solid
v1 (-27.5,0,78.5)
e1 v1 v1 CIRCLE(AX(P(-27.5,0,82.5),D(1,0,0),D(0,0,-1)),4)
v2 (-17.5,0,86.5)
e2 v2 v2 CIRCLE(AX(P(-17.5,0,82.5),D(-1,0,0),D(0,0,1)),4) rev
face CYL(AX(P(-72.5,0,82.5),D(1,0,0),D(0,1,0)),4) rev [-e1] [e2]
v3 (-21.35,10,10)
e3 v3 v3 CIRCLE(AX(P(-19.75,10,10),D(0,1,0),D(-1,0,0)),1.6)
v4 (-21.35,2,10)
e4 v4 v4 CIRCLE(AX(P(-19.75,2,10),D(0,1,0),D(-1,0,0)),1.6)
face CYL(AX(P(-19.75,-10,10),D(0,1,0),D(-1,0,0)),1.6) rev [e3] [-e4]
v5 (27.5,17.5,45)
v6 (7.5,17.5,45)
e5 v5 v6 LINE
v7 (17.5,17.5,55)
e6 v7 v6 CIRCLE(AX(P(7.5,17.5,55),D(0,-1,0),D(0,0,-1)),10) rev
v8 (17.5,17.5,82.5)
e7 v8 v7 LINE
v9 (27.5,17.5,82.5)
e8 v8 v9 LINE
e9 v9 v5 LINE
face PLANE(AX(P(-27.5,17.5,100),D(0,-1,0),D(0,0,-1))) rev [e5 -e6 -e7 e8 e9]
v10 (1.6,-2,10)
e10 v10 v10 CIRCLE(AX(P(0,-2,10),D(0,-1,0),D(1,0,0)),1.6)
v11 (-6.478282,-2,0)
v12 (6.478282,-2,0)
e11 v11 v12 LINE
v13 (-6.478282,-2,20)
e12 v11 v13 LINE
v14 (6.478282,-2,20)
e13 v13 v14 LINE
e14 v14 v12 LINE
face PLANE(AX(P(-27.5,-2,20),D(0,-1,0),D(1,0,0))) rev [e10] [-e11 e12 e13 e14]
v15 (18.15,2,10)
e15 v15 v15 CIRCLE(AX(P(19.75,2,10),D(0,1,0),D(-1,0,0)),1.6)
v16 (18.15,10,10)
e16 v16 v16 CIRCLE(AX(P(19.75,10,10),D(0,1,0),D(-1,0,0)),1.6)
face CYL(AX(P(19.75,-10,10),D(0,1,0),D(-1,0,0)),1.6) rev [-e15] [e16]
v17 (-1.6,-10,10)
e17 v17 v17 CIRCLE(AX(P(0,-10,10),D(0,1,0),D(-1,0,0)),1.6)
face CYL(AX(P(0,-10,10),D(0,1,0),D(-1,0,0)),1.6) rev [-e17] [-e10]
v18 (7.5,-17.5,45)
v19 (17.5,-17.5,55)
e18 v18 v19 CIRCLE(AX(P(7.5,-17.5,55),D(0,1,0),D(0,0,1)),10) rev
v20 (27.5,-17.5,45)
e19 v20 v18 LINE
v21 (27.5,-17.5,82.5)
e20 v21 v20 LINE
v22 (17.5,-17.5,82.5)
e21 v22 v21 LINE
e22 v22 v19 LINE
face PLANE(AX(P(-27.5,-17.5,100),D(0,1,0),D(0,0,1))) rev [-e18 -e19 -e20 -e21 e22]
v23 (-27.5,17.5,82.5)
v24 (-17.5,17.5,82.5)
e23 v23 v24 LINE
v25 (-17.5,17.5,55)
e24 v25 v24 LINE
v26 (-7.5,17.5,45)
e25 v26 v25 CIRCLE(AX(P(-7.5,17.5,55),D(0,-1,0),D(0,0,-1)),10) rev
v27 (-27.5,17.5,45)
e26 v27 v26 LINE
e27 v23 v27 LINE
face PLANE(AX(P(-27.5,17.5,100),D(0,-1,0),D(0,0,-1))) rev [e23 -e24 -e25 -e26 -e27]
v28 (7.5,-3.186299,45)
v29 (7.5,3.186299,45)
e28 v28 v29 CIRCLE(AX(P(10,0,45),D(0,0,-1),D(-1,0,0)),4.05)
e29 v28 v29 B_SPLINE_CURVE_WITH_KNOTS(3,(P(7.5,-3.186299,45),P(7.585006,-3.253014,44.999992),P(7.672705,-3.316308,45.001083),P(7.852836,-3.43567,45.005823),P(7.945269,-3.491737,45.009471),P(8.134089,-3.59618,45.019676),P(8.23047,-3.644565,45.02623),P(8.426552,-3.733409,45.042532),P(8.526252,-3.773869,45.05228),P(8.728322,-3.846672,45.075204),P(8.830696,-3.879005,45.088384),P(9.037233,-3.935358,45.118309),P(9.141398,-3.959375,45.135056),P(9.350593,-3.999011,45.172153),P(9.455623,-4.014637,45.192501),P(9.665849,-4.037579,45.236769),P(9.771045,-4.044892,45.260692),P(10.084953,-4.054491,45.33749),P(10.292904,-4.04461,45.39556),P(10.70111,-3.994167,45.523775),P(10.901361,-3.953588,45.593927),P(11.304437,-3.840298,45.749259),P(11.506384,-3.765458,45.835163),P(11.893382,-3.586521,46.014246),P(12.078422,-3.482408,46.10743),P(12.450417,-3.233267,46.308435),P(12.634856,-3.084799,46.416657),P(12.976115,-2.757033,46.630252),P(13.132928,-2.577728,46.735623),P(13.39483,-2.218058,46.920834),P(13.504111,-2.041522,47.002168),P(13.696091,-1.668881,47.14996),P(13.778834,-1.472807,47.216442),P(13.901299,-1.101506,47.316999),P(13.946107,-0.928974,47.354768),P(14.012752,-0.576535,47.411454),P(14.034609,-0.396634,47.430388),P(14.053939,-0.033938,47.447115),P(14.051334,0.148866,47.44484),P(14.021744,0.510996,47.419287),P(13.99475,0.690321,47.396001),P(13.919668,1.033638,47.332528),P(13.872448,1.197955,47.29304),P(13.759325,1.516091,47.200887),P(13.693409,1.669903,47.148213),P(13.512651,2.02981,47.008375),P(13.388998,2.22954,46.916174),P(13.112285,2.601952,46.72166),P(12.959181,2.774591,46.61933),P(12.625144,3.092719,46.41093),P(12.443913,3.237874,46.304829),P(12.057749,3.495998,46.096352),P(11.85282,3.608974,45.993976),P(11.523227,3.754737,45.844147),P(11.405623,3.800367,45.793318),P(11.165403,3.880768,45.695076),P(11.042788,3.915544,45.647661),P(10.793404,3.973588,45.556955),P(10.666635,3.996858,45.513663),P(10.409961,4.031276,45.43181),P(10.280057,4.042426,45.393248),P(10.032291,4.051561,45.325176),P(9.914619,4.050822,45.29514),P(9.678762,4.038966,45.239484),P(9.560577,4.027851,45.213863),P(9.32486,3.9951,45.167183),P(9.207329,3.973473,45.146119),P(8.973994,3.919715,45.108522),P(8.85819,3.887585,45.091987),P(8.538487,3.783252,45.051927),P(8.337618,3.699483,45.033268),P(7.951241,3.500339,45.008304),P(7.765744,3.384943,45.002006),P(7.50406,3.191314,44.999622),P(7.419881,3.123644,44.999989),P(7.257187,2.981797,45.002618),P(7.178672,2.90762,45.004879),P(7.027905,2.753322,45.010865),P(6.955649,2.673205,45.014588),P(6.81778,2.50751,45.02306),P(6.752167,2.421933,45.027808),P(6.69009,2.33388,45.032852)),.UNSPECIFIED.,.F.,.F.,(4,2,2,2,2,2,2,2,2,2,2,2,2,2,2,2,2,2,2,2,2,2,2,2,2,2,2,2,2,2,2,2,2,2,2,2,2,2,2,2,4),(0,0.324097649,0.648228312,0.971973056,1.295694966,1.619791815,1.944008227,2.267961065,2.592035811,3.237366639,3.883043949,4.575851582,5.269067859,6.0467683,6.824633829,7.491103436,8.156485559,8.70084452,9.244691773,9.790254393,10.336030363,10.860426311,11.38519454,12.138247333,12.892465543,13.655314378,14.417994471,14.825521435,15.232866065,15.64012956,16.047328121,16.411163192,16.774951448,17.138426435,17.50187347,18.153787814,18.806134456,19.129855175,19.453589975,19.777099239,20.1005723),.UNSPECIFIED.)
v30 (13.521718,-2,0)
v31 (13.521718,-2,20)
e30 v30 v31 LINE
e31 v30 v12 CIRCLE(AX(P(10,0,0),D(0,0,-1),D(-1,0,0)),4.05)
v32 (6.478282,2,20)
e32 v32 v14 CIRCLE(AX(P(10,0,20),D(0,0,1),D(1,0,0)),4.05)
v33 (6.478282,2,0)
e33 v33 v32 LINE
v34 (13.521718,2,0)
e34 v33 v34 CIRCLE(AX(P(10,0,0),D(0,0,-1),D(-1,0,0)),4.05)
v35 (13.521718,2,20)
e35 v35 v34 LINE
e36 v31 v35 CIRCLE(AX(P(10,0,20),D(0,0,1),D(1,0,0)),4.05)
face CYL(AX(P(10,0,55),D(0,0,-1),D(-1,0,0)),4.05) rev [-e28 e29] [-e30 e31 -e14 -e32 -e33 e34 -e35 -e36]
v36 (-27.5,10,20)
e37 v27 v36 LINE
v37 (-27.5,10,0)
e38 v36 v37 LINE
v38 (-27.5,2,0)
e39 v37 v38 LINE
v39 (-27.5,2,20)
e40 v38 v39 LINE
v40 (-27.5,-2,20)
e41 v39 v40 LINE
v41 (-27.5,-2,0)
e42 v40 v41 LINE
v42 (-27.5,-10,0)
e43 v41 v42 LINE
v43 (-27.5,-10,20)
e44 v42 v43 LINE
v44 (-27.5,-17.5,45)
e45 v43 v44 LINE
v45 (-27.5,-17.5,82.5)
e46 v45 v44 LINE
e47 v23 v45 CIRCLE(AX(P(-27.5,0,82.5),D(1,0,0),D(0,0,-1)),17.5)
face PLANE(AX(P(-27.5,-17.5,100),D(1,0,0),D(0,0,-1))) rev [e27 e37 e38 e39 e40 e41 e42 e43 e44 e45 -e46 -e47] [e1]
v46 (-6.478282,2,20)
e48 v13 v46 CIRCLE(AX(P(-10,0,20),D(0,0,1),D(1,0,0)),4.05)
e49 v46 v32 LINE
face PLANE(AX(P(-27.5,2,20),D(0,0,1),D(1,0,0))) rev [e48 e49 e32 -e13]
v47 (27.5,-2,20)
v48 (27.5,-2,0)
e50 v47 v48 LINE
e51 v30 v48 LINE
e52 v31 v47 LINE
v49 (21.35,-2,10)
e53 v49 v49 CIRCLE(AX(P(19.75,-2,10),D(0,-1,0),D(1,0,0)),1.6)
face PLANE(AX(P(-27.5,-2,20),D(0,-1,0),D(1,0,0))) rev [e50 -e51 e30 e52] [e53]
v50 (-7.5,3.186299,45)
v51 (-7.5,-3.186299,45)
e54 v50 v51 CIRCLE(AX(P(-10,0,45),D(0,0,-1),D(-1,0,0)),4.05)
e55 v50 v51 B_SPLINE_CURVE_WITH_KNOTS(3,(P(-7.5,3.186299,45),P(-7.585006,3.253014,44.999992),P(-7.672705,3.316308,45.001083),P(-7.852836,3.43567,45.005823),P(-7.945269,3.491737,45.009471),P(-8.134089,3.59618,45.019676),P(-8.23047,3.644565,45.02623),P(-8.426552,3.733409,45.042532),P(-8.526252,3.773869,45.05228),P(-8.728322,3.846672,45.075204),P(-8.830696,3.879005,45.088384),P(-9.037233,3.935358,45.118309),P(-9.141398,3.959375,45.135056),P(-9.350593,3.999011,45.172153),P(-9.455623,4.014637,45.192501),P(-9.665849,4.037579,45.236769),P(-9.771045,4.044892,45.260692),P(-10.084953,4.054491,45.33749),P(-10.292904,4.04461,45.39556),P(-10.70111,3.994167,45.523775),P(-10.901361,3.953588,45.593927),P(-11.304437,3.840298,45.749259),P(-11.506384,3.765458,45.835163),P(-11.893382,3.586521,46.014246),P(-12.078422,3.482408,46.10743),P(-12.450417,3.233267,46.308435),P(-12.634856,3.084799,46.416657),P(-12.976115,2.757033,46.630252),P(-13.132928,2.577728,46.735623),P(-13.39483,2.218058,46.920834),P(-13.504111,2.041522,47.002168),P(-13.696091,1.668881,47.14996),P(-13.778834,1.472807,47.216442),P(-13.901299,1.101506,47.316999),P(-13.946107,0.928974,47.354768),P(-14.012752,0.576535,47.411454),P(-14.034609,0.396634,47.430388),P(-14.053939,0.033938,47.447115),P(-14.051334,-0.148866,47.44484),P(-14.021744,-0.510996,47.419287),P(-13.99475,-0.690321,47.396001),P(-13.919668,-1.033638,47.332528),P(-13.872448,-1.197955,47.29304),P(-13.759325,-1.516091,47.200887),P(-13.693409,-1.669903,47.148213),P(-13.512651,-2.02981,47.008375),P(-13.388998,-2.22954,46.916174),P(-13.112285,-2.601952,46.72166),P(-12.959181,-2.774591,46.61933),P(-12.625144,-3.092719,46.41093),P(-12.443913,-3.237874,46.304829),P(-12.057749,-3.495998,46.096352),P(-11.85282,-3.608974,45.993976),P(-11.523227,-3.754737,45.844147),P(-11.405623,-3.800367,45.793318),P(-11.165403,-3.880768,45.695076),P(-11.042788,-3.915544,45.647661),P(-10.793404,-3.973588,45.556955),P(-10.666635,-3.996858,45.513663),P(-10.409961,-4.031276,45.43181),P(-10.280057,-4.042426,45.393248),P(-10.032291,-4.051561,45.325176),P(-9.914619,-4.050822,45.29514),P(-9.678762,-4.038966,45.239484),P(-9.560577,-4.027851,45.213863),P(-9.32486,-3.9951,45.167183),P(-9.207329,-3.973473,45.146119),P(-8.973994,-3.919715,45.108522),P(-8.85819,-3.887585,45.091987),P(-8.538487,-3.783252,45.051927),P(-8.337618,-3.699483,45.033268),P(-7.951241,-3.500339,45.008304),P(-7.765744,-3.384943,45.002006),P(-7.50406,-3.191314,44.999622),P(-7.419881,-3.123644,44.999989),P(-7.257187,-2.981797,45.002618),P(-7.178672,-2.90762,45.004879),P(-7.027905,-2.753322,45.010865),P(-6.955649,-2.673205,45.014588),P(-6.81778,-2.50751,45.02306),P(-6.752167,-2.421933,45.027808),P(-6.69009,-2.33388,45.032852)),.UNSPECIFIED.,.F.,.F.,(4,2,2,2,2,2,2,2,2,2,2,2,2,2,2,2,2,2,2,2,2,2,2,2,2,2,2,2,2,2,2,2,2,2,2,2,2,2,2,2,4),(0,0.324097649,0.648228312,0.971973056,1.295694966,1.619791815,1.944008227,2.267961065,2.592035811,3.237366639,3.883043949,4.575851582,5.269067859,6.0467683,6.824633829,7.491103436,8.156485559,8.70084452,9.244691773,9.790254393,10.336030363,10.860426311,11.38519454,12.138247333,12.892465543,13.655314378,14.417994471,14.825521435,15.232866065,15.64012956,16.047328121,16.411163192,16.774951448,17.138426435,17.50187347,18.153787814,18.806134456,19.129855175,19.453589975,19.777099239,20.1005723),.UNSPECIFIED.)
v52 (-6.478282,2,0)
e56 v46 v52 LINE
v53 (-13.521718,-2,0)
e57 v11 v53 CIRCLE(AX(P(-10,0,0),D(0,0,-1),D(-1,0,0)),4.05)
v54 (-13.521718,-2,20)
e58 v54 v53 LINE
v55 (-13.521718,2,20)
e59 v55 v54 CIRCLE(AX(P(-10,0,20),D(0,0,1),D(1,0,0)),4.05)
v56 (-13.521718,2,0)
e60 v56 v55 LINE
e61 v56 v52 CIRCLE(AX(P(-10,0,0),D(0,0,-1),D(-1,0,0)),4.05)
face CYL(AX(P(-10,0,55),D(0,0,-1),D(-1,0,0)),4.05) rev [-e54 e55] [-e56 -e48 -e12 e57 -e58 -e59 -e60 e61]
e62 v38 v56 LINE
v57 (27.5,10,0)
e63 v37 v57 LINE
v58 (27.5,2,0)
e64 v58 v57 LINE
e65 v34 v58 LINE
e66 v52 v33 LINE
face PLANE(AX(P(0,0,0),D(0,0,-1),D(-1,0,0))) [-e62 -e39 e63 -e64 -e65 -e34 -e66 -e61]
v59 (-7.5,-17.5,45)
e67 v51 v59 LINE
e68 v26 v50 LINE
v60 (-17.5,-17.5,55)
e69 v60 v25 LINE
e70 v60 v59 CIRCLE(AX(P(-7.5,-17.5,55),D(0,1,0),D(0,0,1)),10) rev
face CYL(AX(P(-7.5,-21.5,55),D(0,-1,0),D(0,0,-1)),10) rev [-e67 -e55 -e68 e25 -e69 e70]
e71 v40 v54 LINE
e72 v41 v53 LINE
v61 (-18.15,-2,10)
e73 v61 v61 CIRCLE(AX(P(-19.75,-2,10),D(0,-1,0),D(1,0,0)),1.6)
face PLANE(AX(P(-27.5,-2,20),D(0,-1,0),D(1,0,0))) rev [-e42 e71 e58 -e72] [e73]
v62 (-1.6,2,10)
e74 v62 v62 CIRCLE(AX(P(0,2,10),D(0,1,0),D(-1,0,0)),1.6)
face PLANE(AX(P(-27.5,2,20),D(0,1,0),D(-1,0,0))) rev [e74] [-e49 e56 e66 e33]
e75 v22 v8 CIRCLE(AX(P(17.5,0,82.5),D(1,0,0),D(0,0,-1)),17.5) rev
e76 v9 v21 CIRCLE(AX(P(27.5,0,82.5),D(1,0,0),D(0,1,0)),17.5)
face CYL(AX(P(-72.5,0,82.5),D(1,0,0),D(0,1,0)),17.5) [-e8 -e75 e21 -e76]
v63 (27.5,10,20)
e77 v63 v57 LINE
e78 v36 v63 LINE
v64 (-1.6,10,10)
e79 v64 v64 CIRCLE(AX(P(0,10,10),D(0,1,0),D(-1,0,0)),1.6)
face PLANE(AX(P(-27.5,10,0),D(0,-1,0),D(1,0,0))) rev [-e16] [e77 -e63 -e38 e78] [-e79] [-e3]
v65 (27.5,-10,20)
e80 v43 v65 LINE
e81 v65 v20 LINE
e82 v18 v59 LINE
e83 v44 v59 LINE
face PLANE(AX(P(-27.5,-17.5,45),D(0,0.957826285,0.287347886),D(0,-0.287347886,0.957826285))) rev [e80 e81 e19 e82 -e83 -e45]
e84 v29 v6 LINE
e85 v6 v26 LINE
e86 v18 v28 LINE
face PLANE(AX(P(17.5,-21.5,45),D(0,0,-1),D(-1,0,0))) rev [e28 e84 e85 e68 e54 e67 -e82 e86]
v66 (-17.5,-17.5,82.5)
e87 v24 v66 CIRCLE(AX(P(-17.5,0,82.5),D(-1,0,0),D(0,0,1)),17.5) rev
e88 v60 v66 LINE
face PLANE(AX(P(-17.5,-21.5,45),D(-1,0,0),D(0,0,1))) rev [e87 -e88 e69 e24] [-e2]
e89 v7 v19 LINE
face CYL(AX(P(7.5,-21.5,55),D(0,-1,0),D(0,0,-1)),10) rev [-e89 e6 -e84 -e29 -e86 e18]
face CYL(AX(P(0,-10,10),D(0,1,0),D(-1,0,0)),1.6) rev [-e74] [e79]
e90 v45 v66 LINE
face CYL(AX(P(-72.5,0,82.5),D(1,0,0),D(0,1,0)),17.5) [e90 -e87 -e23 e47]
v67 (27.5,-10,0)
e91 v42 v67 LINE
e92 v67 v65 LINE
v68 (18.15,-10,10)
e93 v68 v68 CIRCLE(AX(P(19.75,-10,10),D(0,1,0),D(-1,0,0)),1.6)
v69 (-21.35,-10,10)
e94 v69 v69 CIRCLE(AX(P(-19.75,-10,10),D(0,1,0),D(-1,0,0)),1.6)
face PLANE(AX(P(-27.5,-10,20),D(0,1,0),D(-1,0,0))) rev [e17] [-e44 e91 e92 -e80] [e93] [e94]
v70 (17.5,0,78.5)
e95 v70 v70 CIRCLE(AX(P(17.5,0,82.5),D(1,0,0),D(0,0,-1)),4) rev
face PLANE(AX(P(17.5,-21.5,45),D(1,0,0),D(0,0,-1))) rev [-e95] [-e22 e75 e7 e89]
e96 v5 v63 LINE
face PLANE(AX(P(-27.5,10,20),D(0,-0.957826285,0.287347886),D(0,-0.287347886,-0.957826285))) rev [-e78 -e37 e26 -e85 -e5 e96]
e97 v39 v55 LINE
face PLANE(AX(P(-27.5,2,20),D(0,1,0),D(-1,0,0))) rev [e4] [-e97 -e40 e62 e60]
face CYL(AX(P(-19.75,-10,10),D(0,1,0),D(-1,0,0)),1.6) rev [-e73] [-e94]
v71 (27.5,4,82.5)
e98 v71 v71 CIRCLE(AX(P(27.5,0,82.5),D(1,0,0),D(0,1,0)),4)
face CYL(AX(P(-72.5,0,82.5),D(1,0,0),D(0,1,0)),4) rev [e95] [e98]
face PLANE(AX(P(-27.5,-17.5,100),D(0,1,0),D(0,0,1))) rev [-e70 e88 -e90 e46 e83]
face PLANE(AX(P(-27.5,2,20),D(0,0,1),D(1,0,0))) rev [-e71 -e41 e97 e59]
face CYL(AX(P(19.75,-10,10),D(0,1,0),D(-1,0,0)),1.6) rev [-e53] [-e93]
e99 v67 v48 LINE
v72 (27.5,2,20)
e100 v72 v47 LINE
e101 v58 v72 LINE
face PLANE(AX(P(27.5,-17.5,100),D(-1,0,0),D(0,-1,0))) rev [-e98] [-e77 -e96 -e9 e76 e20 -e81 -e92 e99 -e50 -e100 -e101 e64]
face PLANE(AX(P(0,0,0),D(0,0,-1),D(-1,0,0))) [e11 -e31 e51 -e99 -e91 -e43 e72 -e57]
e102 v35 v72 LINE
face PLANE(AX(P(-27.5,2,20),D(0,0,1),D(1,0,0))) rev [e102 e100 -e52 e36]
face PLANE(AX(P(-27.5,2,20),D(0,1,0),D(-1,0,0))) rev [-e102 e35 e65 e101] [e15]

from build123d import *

# Parameters (mm, degrees)
CROQUIS1_W              = 55
CROQUIS1_H              = 35
SALIENTE_EXTRUIR1_DEPTH = 100
CROQUIS2_R              = 4
CORTAR_EXTRUIR1_DEPTH   = 100
CROQUIS3_W              = 35
CROQUIS3_H              = 55
CORTAR_EXTRUIR2_DEPTH   = 39
CROQUIS6_W              = 20
CROQUIS6_H              = 4
CORTAR_EXTRUIR3_DEPTH   = 55
CROQUIS7_R              = 4.05
CORTAR_EXTRUIR4_DEPTH   = 55
REDONDEO1_R             = 10
REDONDEO2_R             = 10
CROQUIS8_R              = 1.6
CORTAR_EXTRUIR5_DEPTH   = 20


with BuildPart() as part:
    # Croquis1 → Saliente-Extruir1 (new body)
    with BuildSketch(Plane.XY):
        Rectangle(CROQUIS1_W, CROQUIS1_H)
    extrude(amount=SALIENTE_EXTRUIR1_DEPTH)

    # Croquis2 → Cortar-Extruir1 (cut)
    with BuildSketch(Plane(origin=(27.5, 0, 0), x_dir=(0, 0, -1), z_dir=(1, 0, 0))):
        with Locations(Location((-82.5, 0, 0), (0, 0, 90))):
            Circle(CROQUIS2_R)
        with BuildLine():
            ThreePointArc((-100, 0), (-94.874368671, 12.374368671), (-82.5, 17.5))
            Line((-82.5, 17.5), (-100, 17.5))
            Line((-100, 17.5), (-100, 0))
        make_face()
        with BuildLine():
            ThreePointArc((-82.5, -17.5), (-94.874368671, -12.374368671), (-100, 0))
            Line((-100, 0), (-100, -17.5))
            Line((-100, -17.5), (-82.5, -17.5))
        make_face()
    extrude(amount=-CORTAR_EXTRUIR1_DEPTH, mode=Mode.SUBTRACT)

    # Croquis3 → Cortar-Extruir2 (cut)
    with BuildSketch(Plane(origin=(0, 17.5, 0), x_dir=(1, 0, 0), z_dir=(0, 1, 0))):
        with Locations((0, -72.5)):
            Rectangle(CROQUIS3_W, CROQUIS3_H)
    extrude(amount=-CORTAR_EXTRUIR2_DEPTH, mode=Mode.SUBTRACT)

    # Croquis6 → Cortar-Extruir3 (cut)
    with BuildSketch(Plane(origin=(27.5, 0, 0), x_dir=(0, 0, -1), z_dir=(1, 0, 0))):
        Polygon((-45, 17.5), (0, 17.5), (0, 10), (-20, 10), align=None)
        with Locations((-10, 0)):
            Rectangle(CROQUIS6_W, CROQUIS6_H)
        Polygon((-45, -17.5), (-20, -10), (0, -10), (0, -17.5), align=None)
    extrude(amount=-CORTAR_EXTRUIR3_DEPTH, mode=Mode.SUBTRACT)

    # Croquis7 → Cortar-Extruir4 (cut)
    with BuildSketch(Plane(origin=(0, 0, 0), x_dir=(-1, 0, 0), z_dir=(0, 0, -1))):
        with Locations((-10, 0)):
            Circle(CROQUIS7_R)
        with Locations((10, 0)):
            Circle(CROQUIS7_R)
    extrude(amount=-CORTAR_EXTRUIR4_DEPTH, mode=Mode.SUBTRACT)

    # Redondeo1
    # the kernel refuses this fillet: 10 mm, written as the material it adds along each edge
    with BuildSketch(Plane(origin=(-17.5, 17.5, 45), x_dir=(1, 0, 0), z_dir=(0, -1, 0))) as redondeo1_piece_1_section:
        with BuildLine():
            CenterArc((REDONDEO1_R, REDONDEO1_R), REDONDEO1_R, 180, 90)
            Line((0, REDONDEO1_R), (0, 0))
            Line((0, 0), (REDONDEO1_R, 0))
        make_face()
    redondeo1_piece_1 = extrude(amount=35, mode=Mode.PRIVATE)
    redondeo1_piece_1 = split(redondeo1_piece_1, bisect_by=Plane(origin=(-15.390656306, -16.700081338, 42.33360446), z_dir=(0, 0.9578262852211515, 0.2873478855663453)), keep=Keep.TOP, mode=Mode.PRIVATE)
    redondeo1_piece_1 = split(redondeo1_piece_1, bisect_by=Plane(origin=(-15.390656306, 16.700081275, 42.333604252), z_dir=(0, -0.9578262852211514, 0.28734788556634544)), keep=Keep.TOP, mode=Mode.PRIVATE)
    redondeo1_piece_1 = redondeo1_piece_1 - Plane(origin=(-10, 0, 47.343628748), x_dir=(-1, 0, 0), z_dir=(0, 0, -1)) * Cylinder(4.05, 110, mode=Mode.PRIVATE)
    add(redondeo1_piece_1)

    # Redondeo2
    # the kernel refuses this fillet: 10 mm, written as the material it adds along each edge
    with BuildSketch(Plane(origin=(17.5, 17.5, 45), x_dir=(0, 0, 1), z_dir=(0, -1, 0))) as redondeo2_piece_1_section:
        with BuildLine():
            CenterArc((REDONDEO2_R, REDONDEO2_R), REDONDEO2_R, 180, 90)
            Line((0, REDONDEO2_R), (0, 0))
            Line((0, 0), (REDONDEO2_R, 0))
        make_face()
    redondeo2_piece_1 = extrude(amount=35, mode=Mode.PRIVATE)
    redondeo2_piece_1 = redondeo2_piece_1 - Plane(origin=(10, 0, 47.343628624), x_dir=(-1, 0, 0), z_dir=(0, 0, -1)) * Cylinder(4.05, 110, mode=Mode.PRIVATE)
    redondeo2_piece_1 = split(redondeo2_piece_1, bisect_by=Plane(origin=(15.390657599, 16.700081065, 42.333603552), z_dir=(0, -0.9578262852211514, 0.28734788556634544)), keep=Keep.TOP, mode=Mode.PRIVATE)
    redondeo2_piece_1 = split(redondeo2_piece_1, bisect_by=Plane(origin=(15.390657599, -16.70008148, 42.333604932), z_dir=(0, 0.9578262852211515, 0.2873478855663453)), keep=Keep.TOP, mode=Mode.PRIVATE)
    add(redondeo2_piece_1)

    # Croquis8 → Cortar-Extruir5 (cut)
    with BuildSketch(Plane(origin=(0, 10, 0), x_dir=(1, 0, 0), z_dir=(0, 1, 0))):
        with Locations(Location((0, -10, 0), (0, 0, 180))):
            Circle(CROQUIS8_R)
        with Locations(Location((-19.75, -10, 0), (0, 0, 180))):
            Circle(CROQUIS8_R)
        with Locations(Location((19.75, -10, 0), (0, 0, 180))):
            Circle(CROQUIS8_R)
    extrude(amount=-CORTAR_EXTRUIR5_DEPTH, mode=Mode.SUBTRACT)


solid = part.part
